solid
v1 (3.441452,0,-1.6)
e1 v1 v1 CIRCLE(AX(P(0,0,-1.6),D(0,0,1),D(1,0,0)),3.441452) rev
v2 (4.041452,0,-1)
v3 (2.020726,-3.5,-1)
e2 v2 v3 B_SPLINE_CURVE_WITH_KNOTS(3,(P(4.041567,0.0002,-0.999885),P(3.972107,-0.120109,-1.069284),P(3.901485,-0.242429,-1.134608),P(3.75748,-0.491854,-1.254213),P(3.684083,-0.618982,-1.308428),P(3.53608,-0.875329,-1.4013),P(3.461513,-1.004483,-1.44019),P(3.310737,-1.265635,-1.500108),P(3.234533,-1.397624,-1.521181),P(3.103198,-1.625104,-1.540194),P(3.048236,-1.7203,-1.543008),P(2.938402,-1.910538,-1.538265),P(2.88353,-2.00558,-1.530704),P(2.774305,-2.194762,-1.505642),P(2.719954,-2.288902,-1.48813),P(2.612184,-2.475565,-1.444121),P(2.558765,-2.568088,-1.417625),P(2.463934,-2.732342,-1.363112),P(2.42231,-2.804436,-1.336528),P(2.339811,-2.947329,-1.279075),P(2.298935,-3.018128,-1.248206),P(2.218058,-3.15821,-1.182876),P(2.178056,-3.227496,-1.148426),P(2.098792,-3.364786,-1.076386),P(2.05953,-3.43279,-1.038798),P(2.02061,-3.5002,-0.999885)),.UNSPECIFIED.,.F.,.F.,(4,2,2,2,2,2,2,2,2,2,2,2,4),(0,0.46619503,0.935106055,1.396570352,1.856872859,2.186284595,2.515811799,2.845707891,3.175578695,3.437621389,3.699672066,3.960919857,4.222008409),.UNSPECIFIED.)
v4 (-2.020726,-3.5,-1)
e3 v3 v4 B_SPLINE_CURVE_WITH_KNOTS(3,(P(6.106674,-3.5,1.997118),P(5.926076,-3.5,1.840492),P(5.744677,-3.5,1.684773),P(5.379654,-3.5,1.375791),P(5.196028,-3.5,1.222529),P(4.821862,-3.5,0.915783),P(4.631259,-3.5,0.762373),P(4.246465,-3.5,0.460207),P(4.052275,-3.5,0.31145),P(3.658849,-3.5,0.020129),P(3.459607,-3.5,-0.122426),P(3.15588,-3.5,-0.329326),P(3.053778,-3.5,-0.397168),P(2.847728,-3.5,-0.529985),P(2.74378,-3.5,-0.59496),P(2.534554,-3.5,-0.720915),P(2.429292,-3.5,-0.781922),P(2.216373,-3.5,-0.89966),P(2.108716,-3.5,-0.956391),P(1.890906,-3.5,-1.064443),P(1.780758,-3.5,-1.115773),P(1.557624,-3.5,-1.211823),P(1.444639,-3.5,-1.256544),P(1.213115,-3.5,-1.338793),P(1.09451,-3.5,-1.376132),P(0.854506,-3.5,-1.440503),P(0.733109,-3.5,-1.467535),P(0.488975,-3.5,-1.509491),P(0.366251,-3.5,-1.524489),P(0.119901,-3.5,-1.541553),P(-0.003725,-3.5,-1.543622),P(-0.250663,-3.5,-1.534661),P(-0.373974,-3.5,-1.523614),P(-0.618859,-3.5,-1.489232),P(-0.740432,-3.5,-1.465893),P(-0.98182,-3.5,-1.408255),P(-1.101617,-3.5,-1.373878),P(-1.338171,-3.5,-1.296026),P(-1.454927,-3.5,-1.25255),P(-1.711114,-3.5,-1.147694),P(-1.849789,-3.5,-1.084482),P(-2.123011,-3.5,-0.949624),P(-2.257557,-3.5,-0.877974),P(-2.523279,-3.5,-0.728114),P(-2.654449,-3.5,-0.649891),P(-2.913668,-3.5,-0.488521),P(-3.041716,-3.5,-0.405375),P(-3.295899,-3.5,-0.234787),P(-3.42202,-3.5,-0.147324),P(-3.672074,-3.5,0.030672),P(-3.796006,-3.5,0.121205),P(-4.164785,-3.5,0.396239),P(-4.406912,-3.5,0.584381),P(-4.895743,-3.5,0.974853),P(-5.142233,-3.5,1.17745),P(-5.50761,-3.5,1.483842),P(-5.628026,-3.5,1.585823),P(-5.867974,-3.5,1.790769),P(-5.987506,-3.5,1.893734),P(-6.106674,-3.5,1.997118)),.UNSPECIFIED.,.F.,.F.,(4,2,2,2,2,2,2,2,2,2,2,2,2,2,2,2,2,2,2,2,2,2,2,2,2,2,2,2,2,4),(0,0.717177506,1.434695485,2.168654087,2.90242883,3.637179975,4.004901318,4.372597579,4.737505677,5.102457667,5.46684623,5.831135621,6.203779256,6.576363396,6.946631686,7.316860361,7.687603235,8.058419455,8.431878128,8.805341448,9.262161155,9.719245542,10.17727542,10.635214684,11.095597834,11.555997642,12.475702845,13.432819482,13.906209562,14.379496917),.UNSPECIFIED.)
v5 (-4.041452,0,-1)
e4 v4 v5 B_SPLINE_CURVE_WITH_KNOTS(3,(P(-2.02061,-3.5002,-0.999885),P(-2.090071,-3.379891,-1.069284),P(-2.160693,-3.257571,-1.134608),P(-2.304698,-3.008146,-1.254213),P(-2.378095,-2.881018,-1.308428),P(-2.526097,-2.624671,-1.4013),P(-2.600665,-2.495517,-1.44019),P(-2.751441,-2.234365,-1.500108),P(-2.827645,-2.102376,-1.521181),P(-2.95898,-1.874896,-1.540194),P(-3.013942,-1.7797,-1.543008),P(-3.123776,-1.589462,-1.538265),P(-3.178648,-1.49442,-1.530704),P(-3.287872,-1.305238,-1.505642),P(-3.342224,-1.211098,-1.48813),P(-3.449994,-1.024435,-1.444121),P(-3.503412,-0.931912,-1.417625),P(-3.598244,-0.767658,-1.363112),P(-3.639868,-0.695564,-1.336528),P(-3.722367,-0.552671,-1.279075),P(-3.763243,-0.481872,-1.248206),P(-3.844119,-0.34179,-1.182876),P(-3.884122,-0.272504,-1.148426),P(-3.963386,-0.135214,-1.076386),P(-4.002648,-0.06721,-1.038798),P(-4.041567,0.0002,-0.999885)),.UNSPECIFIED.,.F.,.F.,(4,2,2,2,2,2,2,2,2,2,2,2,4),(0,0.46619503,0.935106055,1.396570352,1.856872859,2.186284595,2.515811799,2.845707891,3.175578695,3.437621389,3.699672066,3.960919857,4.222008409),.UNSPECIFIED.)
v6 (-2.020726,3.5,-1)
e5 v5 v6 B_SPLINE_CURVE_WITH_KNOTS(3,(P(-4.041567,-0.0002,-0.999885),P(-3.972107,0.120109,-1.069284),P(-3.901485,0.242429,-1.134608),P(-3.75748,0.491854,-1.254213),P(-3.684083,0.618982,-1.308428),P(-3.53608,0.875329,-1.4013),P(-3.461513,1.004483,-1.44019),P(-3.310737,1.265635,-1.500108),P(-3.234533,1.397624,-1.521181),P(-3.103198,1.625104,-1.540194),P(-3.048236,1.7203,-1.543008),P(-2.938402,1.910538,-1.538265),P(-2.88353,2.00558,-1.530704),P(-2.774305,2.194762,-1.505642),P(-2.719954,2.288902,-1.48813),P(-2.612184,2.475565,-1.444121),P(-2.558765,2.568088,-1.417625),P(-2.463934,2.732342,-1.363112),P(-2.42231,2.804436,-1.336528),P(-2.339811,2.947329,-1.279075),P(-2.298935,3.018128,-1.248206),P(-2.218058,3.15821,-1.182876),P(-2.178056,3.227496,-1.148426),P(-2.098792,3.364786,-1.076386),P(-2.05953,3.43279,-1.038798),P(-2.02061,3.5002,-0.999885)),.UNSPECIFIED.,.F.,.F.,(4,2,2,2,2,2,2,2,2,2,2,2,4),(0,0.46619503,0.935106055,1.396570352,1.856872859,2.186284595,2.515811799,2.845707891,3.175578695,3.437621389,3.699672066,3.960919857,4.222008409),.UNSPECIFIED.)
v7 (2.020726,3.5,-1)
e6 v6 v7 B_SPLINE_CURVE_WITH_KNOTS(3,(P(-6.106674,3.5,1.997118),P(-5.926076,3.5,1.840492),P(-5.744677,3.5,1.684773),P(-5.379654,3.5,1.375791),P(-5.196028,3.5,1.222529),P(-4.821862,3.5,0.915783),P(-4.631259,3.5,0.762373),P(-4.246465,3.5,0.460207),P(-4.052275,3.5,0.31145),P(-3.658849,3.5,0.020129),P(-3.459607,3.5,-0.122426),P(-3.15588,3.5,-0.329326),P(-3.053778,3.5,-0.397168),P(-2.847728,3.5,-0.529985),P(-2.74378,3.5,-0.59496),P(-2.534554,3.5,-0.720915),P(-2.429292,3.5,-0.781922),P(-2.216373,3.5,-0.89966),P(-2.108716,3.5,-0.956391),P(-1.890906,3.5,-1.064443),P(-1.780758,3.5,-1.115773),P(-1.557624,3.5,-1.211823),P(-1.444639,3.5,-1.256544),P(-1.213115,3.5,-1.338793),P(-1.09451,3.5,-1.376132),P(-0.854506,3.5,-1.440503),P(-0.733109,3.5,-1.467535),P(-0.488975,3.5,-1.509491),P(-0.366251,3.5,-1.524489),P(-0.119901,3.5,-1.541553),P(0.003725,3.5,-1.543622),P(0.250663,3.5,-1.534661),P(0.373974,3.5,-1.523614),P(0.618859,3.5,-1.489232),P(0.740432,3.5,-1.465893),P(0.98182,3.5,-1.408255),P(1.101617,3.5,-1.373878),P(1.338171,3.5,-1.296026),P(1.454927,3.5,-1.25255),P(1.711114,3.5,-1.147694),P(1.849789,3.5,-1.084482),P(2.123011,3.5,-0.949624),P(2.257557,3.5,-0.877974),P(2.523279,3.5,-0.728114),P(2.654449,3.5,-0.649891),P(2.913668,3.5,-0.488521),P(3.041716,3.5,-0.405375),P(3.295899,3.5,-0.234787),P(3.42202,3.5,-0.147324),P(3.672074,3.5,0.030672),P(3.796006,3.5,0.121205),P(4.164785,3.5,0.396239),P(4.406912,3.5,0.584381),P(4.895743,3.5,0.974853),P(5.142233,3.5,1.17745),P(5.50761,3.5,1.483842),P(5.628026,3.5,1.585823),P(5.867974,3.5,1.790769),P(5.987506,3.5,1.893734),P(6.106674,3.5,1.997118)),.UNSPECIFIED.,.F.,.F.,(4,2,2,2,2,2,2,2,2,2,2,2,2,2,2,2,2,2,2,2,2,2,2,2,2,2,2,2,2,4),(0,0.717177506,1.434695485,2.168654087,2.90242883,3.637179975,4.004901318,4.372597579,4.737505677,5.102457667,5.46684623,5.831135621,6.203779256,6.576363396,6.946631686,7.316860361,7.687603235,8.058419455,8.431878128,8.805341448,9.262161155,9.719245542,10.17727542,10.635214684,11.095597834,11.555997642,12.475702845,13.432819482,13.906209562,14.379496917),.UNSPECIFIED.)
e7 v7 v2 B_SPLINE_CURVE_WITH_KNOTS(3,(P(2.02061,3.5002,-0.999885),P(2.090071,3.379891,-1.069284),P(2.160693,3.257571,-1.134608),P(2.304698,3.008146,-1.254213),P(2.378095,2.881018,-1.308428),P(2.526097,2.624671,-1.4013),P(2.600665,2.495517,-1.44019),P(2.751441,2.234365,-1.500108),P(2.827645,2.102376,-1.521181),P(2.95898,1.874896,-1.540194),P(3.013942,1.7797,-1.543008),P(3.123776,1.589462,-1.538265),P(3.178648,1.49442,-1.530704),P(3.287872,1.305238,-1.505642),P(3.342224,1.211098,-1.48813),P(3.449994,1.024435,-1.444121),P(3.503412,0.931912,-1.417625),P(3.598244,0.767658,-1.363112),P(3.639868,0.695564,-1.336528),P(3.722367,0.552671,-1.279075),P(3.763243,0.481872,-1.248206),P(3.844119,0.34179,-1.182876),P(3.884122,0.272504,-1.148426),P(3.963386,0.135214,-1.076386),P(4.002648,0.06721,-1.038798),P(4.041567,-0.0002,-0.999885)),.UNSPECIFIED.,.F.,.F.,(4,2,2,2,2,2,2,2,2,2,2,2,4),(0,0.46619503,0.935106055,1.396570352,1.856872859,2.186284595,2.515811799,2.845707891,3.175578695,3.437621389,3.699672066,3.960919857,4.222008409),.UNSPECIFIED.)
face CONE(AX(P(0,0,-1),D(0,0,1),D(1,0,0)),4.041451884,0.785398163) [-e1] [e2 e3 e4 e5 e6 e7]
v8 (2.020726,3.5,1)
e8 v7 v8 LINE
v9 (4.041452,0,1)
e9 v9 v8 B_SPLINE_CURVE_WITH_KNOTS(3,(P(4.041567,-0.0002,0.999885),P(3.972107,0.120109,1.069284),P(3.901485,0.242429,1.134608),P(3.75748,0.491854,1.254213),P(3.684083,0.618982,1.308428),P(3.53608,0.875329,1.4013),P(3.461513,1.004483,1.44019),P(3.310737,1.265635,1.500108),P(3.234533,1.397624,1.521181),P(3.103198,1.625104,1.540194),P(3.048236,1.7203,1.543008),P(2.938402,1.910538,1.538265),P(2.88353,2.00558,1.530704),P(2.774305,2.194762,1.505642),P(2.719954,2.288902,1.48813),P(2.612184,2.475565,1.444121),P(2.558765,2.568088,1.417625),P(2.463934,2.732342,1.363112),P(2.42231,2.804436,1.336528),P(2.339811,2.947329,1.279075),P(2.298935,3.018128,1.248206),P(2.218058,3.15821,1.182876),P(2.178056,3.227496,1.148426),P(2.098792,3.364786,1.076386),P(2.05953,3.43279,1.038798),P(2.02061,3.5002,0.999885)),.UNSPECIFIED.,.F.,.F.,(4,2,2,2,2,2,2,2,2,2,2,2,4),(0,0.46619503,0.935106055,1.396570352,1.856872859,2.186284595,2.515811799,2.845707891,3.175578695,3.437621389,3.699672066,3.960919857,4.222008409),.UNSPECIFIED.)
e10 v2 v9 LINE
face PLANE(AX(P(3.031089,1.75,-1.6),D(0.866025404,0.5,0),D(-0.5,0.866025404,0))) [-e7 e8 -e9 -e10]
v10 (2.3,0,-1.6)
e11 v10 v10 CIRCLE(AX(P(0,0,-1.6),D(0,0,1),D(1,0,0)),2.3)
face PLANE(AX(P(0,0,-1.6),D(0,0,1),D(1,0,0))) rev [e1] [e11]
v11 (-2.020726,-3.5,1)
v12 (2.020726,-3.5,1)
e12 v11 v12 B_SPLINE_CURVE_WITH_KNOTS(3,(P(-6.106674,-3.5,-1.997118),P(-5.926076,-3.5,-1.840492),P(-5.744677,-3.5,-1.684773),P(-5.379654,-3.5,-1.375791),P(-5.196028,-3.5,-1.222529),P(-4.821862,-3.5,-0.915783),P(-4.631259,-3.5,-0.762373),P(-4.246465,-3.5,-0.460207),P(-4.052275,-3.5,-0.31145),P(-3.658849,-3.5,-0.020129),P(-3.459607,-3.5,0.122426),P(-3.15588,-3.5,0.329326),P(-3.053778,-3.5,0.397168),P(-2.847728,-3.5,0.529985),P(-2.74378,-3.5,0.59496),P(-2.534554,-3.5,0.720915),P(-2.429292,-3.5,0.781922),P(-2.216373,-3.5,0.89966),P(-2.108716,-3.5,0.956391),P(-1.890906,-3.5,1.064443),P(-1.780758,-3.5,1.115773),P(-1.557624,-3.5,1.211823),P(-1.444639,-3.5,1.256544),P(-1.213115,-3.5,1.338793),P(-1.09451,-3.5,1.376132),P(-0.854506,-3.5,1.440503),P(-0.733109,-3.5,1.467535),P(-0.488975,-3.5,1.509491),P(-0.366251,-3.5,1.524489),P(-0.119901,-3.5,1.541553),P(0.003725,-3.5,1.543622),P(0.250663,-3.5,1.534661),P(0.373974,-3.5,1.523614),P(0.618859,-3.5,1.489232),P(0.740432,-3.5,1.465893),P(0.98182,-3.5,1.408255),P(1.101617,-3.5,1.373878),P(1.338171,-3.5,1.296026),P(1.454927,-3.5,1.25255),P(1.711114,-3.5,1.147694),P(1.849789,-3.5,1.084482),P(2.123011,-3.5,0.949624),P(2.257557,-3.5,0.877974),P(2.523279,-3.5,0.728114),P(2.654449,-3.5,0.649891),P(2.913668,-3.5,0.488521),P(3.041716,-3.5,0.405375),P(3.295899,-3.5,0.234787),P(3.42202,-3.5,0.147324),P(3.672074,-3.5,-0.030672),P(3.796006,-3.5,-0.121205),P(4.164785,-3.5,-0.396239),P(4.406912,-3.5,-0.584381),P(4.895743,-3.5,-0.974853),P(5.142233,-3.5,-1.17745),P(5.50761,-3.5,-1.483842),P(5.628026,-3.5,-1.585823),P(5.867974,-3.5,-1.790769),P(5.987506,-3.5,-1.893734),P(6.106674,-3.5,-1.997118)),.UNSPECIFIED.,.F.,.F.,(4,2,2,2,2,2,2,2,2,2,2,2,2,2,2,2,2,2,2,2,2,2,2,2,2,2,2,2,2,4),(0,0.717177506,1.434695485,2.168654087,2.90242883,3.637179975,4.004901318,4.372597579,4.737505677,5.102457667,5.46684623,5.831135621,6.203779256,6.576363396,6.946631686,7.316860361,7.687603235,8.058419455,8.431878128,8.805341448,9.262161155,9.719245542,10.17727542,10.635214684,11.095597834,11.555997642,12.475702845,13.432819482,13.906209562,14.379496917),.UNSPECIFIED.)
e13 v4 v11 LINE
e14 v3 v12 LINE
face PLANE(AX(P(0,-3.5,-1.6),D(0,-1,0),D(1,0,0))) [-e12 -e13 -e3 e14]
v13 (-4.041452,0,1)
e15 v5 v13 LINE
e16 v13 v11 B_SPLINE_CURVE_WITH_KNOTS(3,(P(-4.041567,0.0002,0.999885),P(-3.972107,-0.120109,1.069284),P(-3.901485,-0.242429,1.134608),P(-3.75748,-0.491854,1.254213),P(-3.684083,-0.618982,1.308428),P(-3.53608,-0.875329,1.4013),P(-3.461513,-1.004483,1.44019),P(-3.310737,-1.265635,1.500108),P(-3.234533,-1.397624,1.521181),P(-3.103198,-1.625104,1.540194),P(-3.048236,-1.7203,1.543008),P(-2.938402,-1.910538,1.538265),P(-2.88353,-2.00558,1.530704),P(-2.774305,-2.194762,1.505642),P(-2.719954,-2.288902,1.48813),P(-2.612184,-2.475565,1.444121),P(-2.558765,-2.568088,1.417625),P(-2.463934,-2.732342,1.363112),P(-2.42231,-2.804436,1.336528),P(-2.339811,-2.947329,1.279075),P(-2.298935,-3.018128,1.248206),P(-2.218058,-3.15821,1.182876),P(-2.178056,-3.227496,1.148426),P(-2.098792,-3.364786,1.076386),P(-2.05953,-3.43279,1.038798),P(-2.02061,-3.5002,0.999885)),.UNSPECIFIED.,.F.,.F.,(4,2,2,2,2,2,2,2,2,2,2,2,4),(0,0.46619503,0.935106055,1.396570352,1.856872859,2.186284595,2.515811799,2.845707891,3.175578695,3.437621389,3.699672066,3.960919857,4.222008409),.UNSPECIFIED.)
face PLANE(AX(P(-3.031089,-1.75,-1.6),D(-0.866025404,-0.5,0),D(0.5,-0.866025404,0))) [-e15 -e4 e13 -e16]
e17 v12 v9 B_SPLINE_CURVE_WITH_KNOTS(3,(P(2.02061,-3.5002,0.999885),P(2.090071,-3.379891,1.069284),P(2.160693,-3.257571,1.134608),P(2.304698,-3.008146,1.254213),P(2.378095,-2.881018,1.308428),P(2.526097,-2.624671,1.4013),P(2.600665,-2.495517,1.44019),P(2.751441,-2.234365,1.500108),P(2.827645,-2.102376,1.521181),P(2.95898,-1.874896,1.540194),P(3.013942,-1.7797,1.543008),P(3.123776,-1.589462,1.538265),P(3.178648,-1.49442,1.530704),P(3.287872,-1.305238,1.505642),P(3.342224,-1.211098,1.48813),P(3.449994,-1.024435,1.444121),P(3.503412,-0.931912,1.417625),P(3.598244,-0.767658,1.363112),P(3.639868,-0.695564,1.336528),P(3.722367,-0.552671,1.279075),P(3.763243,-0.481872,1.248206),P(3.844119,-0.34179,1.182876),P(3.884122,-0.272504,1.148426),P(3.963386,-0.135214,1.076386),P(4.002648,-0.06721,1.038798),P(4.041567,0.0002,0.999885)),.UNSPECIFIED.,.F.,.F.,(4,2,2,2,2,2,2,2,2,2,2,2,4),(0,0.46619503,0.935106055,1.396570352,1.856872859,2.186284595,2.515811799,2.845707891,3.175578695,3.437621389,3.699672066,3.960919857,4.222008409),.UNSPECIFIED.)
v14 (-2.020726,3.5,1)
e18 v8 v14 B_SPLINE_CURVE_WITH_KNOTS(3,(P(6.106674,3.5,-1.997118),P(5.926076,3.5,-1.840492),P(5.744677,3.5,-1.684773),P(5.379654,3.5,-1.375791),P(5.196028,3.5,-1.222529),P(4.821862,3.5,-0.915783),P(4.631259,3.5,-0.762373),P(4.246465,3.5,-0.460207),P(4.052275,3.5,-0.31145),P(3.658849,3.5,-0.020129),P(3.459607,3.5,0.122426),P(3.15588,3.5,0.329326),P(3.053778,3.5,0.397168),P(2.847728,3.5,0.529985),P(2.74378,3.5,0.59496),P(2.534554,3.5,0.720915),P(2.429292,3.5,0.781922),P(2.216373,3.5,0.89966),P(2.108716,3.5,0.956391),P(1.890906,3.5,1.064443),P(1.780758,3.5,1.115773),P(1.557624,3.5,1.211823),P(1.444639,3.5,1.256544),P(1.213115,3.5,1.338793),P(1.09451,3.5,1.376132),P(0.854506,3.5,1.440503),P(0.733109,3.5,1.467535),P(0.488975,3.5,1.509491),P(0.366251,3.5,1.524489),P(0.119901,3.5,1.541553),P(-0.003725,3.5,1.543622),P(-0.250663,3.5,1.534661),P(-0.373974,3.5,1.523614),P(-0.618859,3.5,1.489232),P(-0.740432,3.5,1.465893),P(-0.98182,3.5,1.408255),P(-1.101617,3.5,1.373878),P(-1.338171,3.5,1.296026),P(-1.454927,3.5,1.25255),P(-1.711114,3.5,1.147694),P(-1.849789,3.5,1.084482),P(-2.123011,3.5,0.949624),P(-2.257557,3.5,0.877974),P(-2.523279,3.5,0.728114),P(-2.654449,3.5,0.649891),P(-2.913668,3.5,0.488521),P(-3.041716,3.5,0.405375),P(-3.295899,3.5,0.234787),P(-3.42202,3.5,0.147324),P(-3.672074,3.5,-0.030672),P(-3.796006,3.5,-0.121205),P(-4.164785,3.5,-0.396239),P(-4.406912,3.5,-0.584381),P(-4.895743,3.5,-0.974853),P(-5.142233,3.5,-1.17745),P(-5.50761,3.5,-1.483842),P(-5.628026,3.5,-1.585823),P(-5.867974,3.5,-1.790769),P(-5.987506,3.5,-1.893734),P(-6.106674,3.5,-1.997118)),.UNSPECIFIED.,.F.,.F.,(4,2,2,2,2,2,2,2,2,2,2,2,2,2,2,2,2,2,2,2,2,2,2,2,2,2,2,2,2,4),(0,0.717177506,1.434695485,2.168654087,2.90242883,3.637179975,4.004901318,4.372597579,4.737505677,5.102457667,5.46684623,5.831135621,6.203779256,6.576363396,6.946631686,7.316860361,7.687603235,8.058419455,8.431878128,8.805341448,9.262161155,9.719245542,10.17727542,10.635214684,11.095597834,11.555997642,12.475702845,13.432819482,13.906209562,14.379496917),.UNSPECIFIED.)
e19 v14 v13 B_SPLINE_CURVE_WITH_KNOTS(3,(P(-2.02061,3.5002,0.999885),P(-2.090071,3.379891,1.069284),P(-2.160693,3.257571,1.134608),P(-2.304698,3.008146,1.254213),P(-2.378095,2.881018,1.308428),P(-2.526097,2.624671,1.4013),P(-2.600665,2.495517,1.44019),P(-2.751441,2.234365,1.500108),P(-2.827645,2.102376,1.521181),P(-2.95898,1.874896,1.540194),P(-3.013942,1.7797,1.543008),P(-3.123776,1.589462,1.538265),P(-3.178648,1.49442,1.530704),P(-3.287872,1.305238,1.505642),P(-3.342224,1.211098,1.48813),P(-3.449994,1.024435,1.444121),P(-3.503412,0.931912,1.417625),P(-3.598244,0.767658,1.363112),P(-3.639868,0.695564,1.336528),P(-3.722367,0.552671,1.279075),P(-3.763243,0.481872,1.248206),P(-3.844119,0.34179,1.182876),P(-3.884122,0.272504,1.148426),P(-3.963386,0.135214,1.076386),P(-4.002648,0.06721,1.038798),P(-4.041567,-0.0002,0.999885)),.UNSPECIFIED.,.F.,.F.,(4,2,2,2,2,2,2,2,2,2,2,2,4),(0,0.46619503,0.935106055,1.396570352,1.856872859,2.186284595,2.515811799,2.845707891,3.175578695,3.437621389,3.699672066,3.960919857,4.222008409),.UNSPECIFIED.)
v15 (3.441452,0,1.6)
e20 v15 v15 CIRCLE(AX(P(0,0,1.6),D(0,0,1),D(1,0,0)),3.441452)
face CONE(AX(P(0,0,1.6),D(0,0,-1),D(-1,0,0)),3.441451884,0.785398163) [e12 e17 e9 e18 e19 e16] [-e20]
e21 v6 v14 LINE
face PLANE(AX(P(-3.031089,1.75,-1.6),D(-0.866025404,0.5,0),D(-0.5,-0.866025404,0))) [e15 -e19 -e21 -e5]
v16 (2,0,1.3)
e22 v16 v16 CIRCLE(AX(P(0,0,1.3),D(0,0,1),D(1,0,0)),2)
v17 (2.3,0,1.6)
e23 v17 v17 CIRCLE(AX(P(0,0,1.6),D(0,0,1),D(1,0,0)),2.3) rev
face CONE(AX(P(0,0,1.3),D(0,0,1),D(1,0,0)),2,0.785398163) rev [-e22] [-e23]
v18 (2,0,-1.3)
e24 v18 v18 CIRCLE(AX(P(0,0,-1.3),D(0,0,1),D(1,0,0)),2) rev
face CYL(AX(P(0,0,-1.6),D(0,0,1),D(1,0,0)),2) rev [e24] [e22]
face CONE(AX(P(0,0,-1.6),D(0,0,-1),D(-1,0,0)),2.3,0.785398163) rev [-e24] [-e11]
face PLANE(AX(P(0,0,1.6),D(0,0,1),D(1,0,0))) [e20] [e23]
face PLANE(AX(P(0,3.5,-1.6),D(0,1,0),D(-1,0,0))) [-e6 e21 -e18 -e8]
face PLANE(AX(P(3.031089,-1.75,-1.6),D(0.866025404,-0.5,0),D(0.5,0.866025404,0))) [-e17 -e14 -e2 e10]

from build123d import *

# Parameters (mm, degrees)
SKETCH1_R           = 4.041451884
BOSS_EXTRUDE1_DEPTH = 1.6
CHAMFER1_SIZE       = 0.6
SKETCH2_R           = 2
CUT_EXTRUDE1_DEPTH  = 7.550318058
CHAMFER2_SIZE       = 0.3


with BuildPart() as part:
    # Sketch1 → Boss-Extrude1 (new, symmetric)
    with BuildSketch(Plane.XY):
        Circle(SKETCH1_R)
    extrude(amount=BOSS_EXTRUDE1_DEPTH, both=True)

    # Chamfer1
    chamfer1_edges = [part.edges().sort_by_distance(p)[0] for p in [
        (-4.041451884, 0, 1.6),
        (-4.041451884, 0, -1.6),
    ]]
    chamfer(chamfer1_edges, length=CHAMFER1_SIZE)

    # Sketch2 → Cut-Extrude1 (cut, through all)
    with BuildSketch(Plane.XY.offset(1.6)):
        with BuildLine():
            ThreePointArc((4.041451884, 0), (3.5, 2.020725942), (2.020725942, 3.5))
            Line((2.020725942, 3.5), (4.041451884, 0))
        make_face()
        with BuildLine():
            Line((-2.020725942, 3.5), (2.020725942, 3.5))
            ThreePointArc((2.020725942, 3.5), (0, 4.041451884), (-2.020725942, 3.5))
        make_face()
        with BuildLine():
            Line((-4.041451884, 0), (-2.020725942, 3.5))
            ThreePointArc((-2.020725942, 3.5), (-3.5, 2.020725942), (-4.041451884, 0))
        make_face()
        with BuildLine():
            ThreePointArc((2.020725942, -3.5), (3.5, -2.020725942), (4.041451884, 0))
            Line((4.041451884, 0), (2.020725942, -3.5))
        make_face()
        with BuildLine():
            Line((-2.020725942, -3.5), (-4.041451884, 0))
            ThreePointArc((-4.041451884, 0), (-3.5, -2.020725942), (-2.020725942, -3.5))
        make_face()
        with BuildLine():
            ThreePointArc((-2.020725942, -3.5), (0, -4.041451884), (2.020725942, -3.5))
            Line((2.020725942, -3.5), (-2.020725942, -3.5))
        make_face()
        Circle(SKETCH2_R)
    extrude(amount=-CUT_EXTRUDE1_DEPTH, mode=Mode.SUBTRACT)

    # Chamfer2
    chamfer2_edges = [part.edges().sort_by_distance(p)[0] for p in [
        (-2, 0, 1.6),
        (-2, 0, -1.6),
    ]]
    chamfer(chamfer2_edges, length=CHAMFER2_SIZE)


solid = part.part
